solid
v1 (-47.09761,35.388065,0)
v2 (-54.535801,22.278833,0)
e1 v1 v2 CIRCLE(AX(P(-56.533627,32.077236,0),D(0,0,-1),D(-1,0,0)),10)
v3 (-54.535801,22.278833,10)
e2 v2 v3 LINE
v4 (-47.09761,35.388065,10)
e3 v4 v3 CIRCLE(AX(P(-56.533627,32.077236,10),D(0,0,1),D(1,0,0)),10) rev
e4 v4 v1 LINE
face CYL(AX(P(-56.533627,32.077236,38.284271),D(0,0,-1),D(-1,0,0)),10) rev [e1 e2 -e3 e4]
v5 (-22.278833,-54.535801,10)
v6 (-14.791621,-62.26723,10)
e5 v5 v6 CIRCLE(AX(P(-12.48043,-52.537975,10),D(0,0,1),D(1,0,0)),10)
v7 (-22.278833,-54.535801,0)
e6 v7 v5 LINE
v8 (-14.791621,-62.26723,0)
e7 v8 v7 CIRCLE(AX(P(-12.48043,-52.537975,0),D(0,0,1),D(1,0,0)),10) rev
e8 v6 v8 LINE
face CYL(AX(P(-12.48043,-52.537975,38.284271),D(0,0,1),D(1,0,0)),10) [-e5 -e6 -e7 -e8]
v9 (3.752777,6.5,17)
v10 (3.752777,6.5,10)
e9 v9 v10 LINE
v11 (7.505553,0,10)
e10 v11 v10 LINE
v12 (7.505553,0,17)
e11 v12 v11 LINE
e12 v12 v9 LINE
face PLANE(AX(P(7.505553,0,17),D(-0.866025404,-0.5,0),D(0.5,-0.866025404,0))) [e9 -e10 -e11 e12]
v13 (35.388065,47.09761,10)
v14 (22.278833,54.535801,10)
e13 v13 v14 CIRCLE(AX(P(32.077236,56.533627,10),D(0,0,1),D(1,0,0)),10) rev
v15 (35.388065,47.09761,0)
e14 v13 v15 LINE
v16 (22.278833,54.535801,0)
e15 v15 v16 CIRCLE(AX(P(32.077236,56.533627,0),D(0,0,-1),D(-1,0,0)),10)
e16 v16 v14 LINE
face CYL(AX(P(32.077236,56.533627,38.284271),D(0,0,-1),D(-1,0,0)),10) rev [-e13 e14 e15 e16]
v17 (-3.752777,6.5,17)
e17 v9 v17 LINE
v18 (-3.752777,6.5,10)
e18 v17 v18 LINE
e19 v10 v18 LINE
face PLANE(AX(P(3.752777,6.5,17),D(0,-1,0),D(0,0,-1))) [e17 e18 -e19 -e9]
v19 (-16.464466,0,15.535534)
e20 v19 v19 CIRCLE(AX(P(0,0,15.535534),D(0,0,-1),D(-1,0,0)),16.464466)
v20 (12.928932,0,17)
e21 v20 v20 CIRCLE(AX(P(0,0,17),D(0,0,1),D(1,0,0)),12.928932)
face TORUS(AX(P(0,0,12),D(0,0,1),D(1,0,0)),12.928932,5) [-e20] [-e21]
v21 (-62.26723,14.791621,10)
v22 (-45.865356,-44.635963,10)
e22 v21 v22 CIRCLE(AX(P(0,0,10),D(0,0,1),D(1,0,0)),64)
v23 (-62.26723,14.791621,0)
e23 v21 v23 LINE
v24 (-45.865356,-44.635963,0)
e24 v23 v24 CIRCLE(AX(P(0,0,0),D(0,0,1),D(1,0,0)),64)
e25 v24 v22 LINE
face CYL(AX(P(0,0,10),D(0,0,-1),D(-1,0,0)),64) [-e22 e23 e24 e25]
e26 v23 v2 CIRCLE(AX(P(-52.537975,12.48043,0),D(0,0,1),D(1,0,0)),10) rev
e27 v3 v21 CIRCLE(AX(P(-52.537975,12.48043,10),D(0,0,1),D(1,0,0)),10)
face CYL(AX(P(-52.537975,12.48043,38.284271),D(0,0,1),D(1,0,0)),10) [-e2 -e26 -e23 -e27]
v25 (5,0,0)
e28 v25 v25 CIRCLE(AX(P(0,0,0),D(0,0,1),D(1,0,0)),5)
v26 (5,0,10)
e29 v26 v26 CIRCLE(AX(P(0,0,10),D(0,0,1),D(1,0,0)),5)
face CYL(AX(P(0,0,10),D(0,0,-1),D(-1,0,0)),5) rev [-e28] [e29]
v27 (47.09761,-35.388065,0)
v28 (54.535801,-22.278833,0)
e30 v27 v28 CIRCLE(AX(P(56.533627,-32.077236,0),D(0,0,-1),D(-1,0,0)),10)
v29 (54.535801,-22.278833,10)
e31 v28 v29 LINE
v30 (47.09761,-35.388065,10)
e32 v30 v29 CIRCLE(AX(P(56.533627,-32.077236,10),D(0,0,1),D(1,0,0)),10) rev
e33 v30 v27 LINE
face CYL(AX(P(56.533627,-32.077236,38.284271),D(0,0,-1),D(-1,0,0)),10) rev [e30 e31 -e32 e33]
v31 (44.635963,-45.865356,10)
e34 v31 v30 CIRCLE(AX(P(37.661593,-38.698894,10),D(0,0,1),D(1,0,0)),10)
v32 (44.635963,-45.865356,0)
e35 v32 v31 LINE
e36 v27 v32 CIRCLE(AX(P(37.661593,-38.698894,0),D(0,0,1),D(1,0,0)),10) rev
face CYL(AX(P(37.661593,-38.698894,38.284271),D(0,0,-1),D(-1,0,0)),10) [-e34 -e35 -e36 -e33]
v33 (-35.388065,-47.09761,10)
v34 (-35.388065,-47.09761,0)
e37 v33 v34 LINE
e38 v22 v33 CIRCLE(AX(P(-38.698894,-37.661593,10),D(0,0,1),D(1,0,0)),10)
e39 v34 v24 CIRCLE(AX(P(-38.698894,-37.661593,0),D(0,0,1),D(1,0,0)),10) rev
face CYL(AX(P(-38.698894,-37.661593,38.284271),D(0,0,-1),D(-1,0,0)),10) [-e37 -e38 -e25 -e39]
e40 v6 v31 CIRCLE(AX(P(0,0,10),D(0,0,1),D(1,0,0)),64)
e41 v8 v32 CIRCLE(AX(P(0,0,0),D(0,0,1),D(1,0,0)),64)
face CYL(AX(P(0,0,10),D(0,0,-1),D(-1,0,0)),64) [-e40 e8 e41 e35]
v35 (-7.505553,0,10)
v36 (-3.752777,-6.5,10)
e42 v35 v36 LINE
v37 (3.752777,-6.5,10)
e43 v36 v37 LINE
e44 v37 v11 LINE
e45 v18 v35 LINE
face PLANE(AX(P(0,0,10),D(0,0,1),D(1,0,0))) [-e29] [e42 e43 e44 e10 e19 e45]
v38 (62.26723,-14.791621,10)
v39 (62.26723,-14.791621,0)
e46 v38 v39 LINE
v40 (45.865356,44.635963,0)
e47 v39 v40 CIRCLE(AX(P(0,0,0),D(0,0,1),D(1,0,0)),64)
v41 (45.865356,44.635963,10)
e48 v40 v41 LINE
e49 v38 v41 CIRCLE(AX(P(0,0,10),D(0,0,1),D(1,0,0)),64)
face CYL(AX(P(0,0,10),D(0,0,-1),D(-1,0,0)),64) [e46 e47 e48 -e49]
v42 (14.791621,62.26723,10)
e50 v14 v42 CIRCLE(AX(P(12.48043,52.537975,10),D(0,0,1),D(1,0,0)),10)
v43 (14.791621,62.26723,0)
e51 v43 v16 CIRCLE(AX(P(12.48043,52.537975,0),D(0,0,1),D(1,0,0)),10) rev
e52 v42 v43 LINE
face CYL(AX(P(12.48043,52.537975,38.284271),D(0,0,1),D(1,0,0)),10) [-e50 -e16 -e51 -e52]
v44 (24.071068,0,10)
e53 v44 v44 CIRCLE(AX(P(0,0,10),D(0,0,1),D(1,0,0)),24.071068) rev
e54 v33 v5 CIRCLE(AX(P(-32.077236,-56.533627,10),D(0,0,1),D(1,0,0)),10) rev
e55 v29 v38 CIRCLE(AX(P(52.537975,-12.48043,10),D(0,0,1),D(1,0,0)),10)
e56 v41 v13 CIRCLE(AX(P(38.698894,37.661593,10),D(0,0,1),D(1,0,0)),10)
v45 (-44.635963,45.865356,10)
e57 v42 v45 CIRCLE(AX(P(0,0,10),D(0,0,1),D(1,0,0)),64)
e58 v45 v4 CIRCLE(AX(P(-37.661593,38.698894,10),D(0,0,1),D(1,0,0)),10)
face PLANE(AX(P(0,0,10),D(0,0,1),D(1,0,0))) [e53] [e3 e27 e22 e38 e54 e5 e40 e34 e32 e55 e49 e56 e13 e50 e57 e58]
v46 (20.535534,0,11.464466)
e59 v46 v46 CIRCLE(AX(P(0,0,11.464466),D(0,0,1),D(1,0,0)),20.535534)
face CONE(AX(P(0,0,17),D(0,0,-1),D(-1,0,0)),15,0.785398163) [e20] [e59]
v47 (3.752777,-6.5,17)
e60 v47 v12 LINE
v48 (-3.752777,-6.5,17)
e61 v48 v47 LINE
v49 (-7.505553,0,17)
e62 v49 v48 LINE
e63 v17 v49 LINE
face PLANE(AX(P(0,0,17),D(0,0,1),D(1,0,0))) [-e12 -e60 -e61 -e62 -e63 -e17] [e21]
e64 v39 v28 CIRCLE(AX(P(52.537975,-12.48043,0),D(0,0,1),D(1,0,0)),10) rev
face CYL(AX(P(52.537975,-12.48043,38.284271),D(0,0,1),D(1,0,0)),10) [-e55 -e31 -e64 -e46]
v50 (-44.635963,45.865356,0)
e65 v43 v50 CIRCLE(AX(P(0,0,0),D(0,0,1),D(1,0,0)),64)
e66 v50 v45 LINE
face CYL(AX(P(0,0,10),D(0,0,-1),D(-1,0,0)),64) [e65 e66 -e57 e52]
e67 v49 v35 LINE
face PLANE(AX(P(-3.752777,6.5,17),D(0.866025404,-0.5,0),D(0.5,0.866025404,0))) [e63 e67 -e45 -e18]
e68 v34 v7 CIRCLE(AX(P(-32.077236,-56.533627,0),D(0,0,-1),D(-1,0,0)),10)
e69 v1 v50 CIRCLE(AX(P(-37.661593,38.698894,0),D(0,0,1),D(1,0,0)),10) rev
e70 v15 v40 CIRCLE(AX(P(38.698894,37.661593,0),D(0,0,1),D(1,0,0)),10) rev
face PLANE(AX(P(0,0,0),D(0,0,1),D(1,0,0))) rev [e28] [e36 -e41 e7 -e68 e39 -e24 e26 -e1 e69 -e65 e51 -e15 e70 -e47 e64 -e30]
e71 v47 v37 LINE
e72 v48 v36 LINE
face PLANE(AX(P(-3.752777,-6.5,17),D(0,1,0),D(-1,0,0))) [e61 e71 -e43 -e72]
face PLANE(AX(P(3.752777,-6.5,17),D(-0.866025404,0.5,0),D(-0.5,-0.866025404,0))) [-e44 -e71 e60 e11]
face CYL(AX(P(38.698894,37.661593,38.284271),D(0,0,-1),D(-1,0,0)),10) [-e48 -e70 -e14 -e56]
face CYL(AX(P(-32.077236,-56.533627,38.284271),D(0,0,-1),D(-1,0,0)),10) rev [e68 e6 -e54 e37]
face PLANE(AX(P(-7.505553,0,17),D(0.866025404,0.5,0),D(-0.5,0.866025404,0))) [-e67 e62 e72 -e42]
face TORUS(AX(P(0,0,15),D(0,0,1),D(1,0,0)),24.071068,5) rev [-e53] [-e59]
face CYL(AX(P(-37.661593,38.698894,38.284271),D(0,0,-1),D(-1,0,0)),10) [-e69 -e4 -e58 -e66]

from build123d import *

# Parameters (mm, degrees)
SKETCH1_R           = 64
SKETCH1_R_2         = 5
BOSS_EXTRUDE1_DEPTH = 10
SKETCH2_R           = 15
BOSS_EXTRUDE2_DEPTH = 7
SKETCH3_R           = 10
CUT_EXTRUDE1_DEPTH  = 10
FILLET1_R           = 10
CHAMFER1_SIZE       = 7


with BuildPart() as part:
    # Sketch1 → Boss-Extrude1 (new body)
    with BuildSketch(Plane.XY):
        Circle(SKETCH1_R)
        Circle(SKETCH1_R_2, mode=Mode.SUBTRACT)
    extrude(amount=BOSS_EXTRUDE1_DEPTH)

    # Sketch2 → Boss-Extrude2 (add)
    with BuildSketch(Plane.XY.offset(10)):
        Circle(SKETCH2_R)
        Polygon((7.505553499, 0), (3.75277675, 6.5), (-3.75277675, 6.5), (-7.505553499, 0), (-3.75277675, -6.5), (3.75277675, -6.5), align=None, mode=Mode.SUBTRACT)
    extrude(amount=BOSS_EXTRUDE2_DEPTH)

    # Sketch3 → Cut-Extrude1 (cut)
    with BuildSketch(Plane(origin=(0, 0, 0), x_dir=(-1, 0, 0), z_dir=(0, 0, -1))):
        with Locations((56.533626817, 32.077235525)):
            Circle(SKETCH3_R)
        with Locations((32.077235525, -56.533626817)):
            Circle(SKETCH3_R)
        with Locations((-56.533626817, -32.077235525)):
            Circle(SKETCH3_R)
        with Locations((-32.077235525, 56.533626817)):
            Circle(SKETCH3_R)
    extrude(amount=-CUT_EXTRUDE1_DEPTH, mode=Mode.SUBTRACT)

    # Fillet1
    fillet1_edges = [part.edges().sort_by_distance(p)[0] for p in [
        (22.646447987, 59.859321693, 5),
        (39.769398937, 50.143742463, 5),
        (59.859321693, -22.646447987, 5),
        (50.143742463, -39.769398937, 5),
        (-22.646447987, -59.859321693, 5),
        (-39.769398937, -50.143742463, 5),
        (-59.859321693, 22.646447987, 5),
        (-50.143742463, 39.769398937, 5),
    ]]
    fillet(fillet1_edges, radius=FILLET1_R)

    # Chamfer1
    chamfer1_edges = [part.edges().sort_by_distance(p)[0] for p in [
        (-15, 0, 10),
    ]]
    chamfer(chamfer1_edges, length=CHAMFER1_SIZE - 0.0001)  # a hair under: the kernel refuses the full size

    # Fillet2: read off the stored shape, not the designer's step
    # Fillet2 outline → Fillet2 (revolve, cut)
    with BuildSketch(Plane.XZ):
        with BuildLine():
            ThreePointArc((12.928932188, 17), (14.84234935, 16.619397663), (16.464466094, 15.535533906))
            Line((16.464466094, 15.535533906), (16.464466094, 17))
            Line((16.464466094, 17), (12.928932188, 17))
        make_face()
    revolve(axis=Axis((0, 0, 0), (0, 0, 1)), mode=Mode.SUBTRACT)

    # Fillet2 2 outline → Fillet2 2 (revolve)
    with BuildSketch(Plane.XZ):
        with BuildLine():
            ThreePointArc((24.071067812, 10), (22.15765065, 10.380602337), (20.535533906, 11.464466094))
            Line((20.535533906, 11.464466094), (20.535533906, 10))
            Line((20.535533906, 10), (24.071067812, 10))
        make_face()
    revolve(axis=Axis((0, 0, 0), (0, 0, 1)))


solid = part.part
